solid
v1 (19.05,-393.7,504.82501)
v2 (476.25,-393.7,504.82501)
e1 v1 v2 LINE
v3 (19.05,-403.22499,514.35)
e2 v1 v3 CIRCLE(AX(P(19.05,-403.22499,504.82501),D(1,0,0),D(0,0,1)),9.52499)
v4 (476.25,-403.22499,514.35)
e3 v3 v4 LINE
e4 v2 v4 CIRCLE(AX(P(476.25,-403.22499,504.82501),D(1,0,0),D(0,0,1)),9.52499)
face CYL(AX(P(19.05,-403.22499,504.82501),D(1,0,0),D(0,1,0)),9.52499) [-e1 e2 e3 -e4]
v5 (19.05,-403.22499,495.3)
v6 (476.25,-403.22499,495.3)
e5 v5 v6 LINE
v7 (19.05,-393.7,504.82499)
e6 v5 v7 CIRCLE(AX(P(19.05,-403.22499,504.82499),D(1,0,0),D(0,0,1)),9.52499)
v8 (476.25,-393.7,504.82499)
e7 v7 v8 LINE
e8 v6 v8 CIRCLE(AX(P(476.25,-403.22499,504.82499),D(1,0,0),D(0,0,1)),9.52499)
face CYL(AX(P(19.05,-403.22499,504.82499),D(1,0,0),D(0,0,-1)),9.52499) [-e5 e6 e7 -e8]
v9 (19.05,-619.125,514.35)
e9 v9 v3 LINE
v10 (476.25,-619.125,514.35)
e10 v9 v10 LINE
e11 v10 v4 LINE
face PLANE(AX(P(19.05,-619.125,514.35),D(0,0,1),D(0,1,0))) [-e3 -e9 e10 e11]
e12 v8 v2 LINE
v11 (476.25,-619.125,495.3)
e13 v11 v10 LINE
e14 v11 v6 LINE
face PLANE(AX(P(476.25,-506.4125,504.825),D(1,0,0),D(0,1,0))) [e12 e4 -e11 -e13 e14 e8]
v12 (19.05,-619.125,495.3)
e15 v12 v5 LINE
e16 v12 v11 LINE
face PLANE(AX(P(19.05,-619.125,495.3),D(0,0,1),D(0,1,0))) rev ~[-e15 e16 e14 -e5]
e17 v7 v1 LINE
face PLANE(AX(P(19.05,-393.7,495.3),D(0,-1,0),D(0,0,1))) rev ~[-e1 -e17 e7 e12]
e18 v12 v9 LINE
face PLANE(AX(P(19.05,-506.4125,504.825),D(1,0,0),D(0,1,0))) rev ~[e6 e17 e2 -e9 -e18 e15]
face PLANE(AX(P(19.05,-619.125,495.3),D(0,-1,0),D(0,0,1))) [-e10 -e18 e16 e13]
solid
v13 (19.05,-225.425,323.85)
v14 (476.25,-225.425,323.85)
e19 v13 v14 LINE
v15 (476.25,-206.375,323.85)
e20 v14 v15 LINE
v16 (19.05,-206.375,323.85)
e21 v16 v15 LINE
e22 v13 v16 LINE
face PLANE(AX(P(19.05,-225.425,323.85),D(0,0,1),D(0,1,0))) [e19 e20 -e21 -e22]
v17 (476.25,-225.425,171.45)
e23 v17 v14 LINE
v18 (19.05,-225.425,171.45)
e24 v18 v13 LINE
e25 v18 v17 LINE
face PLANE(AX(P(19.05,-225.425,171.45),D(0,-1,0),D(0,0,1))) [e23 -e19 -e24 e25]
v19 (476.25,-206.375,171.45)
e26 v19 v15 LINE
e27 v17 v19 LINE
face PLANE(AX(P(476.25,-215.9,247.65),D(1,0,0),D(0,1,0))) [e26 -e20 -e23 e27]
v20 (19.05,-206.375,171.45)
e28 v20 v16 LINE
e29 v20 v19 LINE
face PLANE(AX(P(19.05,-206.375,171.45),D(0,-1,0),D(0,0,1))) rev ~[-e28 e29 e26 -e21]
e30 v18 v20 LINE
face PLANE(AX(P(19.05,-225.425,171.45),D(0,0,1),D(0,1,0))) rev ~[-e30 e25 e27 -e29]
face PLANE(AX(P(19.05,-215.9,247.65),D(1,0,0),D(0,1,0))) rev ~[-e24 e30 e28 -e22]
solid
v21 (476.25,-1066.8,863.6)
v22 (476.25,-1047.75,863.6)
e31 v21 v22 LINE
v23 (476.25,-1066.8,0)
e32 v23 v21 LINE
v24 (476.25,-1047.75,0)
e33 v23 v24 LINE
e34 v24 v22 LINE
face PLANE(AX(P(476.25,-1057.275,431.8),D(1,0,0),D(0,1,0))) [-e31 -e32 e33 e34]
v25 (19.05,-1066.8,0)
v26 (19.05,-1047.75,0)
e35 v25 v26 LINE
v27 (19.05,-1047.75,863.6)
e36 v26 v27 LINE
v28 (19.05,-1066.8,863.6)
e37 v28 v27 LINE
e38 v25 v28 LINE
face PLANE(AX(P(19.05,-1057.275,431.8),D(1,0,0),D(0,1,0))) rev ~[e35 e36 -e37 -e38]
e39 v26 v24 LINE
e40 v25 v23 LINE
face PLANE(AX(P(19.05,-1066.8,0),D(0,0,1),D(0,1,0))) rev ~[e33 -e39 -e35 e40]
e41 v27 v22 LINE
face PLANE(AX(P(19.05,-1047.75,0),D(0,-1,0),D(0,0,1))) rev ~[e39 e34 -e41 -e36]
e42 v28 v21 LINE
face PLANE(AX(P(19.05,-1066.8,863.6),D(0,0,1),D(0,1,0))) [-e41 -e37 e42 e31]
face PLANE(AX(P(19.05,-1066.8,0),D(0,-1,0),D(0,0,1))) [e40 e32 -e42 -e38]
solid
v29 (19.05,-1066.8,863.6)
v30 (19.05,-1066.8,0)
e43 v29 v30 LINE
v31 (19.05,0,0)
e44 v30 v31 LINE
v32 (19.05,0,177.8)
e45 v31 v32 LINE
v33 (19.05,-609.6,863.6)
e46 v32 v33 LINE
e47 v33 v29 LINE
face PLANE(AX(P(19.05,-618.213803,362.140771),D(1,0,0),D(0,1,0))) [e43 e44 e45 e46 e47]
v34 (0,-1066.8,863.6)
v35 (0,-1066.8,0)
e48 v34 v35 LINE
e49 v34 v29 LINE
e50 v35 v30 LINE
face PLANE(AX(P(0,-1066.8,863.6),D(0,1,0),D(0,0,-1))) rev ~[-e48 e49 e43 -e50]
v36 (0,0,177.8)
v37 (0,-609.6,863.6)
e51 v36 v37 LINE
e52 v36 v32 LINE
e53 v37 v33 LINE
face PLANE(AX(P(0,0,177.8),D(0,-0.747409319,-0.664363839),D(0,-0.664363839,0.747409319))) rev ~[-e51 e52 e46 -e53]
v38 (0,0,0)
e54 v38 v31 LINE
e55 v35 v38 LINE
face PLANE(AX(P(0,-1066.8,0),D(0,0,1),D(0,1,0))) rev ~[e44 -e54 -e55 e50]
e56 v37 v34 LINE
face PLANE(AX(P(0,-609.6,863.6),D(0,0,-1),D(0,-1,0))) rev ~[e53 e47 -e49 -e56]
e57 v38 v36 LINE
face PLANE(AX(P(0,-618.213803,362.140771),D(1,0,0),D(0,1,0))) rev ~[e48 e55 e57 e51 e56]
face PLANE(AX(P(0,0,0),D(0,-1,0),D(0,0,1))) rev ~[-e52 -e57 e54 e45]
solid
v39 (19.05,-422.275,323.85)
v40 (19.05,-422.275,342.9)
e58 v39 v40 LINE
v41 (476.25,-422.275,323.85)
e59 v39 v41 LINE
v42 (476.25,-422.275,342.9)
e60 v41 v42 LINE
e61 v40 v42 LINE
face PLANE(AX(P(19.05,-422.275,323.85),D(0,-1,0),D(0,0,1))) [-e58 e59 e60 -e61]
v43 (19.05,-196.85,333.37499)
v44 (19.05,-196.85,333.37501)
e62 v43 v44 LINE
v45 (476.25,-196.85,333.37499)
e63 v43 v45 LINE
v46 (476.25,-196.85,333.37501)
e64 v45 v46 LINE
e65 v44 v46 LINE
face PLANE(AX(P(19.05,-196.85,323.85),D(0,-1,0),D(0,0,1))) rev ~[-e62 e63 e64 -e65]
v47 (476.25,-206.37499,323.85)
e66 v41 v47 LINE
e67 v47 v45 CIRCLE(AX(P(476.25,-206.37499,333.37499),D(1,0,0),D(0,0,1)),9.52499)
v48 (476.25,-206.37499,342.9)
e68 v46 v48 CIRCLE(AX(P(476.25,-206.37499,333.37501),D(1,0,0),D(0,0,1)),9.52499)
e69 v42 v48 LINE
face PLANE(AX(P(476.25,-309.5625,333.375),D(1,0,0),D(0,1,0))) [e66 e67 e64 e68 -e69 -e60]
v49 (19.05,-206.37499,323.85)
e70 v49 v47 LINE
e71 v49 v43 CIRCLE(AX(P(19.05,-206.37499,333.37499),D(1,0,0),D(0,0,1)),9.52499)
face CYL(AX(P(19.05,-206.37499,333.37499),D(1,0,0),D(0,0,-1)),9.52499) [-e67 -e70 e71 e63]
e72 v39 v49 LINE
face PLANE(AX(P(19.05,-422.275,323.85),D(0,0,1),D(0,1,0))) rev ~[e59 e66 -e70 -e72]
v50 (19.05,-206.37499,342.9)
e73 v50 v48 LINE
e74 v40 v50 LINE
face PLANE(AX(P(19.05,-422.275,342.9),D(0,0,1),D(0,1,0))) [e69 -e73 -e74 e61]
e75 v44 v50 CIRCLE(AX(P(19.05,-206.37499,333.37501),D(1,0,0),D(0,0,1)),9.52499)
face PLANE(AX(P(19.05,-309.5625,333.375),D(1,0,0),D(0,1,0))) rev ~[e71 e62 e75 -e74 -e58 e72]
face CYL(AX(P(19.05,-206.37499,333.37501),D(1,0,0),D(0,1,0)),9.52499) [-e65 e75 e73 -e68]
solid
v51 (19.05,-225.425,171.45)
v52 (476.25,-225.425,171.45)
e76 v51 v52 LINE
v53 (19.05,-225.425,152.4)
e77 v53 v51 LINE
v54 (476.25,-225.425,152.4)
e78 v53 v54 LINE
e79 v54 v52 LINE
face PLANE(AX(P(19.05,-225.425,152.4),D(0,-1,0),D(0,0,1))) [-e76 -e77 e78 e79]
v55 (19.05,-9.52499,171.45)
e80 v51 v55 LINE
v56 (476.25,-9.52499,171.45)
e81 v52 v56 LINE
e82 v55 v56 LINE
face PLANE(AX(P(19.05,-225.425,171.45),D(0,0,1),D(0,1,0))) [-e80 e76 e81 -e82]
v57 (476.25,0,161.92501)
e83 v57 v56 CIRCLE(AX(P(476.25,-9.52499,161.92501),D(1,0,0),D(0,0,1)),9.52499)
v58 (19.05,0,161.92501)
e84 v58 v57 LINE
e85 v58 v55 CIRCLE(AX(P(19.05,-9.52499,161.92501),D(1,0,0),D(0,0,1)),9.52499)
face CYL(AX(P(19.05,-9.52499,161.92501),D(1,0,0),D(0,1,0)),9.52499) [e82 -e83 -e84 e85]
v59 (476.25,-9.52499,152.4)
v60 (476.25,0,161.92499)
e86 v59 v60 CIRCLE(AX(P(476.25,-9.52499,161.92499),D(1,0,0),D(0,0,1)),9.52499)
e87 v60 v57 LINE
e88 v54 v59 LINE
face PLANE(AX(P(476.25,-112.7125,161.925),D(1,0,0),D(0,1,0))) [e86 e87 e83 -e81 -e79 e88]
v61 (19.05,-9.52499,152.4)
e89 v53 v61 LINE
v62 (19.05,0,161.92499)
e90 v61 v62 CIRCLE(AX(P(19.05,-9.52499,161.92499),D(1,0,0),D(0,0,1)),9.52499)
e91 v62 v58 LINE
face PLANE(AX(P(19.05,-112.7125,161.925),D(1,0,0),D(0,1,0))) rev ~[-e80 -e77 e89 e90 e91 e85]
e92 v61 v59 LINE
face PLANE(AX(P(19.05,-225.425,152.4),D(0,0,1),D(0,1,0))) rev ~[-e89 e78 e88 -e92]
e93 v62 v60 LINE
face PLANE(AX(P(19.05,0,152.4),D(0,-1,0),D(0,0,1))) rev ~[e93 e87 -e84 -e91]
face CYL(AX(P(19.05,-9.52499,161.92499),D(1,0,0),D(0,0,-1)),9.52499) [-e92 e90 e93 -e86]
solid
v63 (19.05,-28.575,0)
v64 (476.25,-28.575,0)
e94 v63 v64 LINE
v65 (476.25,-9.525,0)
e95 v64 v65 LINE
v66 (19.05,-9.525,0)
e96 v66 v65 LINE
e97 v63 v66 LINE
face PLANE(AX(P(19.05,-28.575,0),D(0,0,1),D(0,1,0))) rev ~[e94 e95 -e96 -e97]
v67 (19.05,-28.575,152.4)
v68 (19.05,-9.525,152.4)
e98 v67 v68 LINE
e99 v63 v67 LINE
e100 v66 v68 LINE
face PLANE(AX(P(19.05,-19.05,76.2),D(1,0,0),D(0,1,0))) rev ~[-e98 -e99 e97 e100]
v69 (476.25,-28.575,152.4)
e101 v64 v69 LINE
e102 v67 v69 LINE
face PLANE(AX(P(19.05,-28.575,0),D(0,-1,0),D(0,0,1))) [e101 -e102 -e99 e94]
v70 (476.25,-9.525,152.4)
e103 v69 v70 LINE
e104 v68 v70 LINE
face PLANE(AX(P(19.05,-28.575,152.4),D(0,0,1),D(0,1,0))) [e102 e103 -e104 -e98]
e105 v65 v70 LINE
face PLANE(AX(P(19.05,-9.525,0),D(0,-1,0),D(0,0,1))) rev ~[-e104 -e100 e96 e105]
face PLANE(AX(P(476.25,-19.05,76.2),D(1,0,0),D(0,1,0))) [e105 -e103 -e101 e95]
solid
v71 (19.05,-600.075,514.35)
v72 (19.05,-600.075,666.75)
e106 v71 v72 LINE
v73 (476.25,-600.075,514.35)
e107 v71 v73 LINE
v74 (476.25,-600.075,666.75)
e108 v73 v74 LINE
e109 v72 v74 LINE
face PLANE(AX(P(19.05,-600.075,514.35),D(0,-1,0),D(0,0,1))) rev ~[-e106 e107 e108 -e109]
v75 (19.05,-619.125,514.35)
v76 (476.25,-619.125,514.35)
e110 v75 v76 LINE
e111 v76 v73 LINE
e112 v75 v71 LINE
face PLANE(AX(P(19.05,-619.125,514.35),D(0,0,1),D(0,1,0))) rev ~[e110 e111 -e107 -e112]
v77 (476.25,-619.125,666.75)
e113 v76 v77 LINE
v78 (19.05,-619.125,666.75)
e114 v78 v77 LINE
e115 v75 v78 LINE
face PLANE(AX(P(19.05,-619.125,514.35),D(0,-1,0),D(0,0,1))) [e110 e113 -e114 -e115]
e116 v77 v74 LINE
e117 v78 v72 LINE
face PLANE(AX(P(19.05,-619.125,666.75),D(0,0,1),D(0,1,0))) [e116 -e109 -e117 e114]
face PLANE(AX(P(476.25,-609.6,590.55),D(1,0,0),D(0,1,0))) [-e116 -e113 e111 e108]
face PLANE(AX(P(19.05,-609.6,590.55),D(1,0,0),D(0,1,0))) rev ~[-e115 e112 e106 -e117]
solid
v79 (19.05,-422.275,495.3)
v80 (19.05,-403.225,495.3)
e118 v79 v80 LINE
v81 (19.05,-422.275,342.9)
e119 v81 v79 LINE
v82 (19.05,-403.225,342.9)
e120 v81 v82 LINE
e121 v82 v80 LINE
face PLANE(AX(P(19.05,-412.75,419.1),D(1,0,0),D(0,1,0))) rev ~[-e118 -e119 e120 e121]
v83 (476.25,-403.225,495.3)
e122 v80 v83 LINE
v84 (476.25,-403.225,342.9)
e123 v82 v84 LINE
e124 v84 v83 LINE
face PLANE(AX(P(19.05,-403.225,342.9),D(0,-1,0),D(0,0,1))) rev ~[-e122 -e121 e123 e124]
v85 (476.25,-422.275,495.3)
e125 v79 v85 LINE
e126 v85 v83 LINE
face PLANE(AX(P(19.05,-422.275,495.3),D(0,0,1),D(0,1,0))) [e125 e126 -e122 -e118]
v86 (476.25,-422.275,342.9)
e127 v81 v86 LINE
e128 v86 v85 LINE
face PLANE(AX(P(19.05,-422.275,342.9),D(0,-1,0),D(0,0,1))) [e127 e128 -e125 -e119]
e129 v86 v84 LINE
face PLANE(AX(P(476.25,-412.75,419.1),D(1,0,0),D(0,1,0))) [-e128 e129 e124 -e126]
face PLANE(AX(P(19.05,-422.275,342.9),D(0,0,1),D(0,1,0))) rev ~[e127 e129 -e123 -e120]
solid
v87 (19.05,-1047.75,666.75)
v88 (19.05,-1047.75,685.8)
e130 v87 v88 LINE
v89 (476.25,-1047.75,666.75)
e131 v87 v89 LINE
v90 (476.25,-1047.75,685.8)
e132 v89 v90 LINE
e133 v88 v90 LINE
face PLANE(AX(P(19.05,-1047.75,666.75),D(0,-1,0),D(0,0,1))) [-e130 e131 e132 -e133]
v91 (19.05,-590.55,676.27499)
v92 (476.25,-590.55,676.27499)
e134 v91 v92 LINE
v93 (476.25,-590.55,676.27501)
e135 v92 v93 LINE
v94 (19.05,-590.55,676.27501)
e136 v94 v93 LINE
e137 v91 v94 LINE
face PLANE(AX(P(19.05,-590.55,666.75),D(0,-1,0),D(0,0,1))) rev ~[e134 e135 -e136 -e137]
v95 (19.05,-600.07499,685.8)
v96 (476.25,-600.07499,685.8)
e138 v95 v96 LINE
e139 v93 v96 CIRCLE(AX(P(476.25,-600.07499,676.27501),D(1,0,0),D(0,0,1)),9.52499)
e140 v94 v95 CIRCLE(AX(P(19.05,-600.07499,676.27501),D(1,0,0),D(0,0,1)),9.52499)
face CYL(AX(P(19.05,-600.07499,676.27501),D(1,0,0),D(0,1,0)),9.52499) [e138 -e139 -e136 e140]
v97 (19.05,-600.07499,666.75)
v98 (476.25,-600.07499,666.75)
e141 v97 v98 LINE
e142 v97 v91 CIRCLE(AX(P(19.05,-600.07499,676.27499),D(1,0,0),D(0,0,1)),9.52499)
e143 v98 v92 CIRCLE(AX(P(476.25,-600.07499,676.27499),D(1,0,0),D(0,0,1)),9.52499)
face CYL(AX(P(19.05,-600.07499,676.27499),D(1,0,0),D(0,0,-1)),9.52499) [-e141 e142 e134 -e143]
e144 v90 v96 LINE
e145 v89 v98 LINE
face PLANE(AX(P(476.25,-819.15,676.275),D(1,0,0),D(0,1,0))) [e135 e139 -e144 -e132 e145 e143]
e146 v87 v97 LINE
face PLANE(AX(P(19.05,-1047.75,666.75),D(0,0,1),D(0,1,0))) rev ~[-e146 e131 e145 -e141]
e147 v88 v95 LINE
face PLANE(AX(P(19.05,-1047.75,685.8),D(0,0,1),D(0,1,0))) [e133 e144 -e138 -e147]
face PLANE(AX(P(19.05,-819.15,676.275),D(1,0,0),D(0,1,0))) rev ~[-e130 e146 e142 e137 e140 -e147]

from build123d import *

# Parameters (mm, degrees)
F1_DEPTH = 19.05
F2_W     = 19.05
F2_H     = 863.6
F3_DEPTH = 457.2
F4_W     = 457.2
F4_H     = 19.05
F5_DEPTH = 457.2
F4_W_2   = 225.425
F6_R     = 9.52499
F6_2_R   = 9.52499
F6_3_R   = 9.52499
F6_4_R   = 9.52499
F7_W     = 19.05
F7_H     = 152.4
F8_DEPTH = 457.2


# Not quite as in the source:
# - a fillet or chamfer is up to 0.001 mm smaller than in the source, because OpenCascade refuses the exact size


with BuildPart() as f1:
    # F0 (on Right) → F1 (new body)
    with BuildSketch(Plane.YZ):
        Polygon((-609.6, 863.6), (-1066.8, 863.6), (-1066.8, 0), (0, 0), (0, 177.8), align=None)
    extrude(amount=F1_DEPTH)


with BuildPart() as f3:
    # F2 (on face) → F3 (new body)
    with BuildSketch(Plane.YZ.offset(19.05)):
        with Locations((-1057.275, 431.8)):
            Rectangle(F2_W, F2_H)
    extrude(amount=F3_DEPTH)


with BuildPart() as f5:
    # F4 (on face) → F5 (new body, through all)
    with BuildSketch(Plane.YZ.offset(19.05)):
        with Locations((-819.15, 676.275)):
            Rectangle(F4_W, F4_H)
    extrude(amount=F5_DEPTH)

    # F6 (radius 9.525 in the source; OpenCascade refuses exactly that, so slightly less here)
    f6_edges = [f5.edges().sort_by_distance(p)[0] for p in [
        (247.65, -590.55, 685.8),
        (247.65, -590.55, 666.75),
    ]]
    fillet(f6_edges, radius=F6_R)


with BuildPart() as f5b:
    # F4 (on face) → F5, piece 2 (new body, through all)
    with BuildSketch(Plane.YZ.offset(19.05)):
        with Locations((-112.7125, 161.925)):
            Rectangle(F4_W_2, F4_H)
    extrude(amount=F5_DEPTH)

    # F6#4 (radius 9.525 in the source; OpenCascade refuses exactly that, so slightly less here)
    f6_4_edges = [f5b.edges().sort_by_distance(p)[0] for p in [
        (247.65, 0, 171.45),
        (247.65, 0, 152.4),
    ]]
    fillet(f6_4_edges, radius=F6_4_R)


with BuildPart() as f5c:
    # F4 (on face) → F5, piece 3 (new body, through all)
    with BuildSketch(Plane.YZ.offset(19.05)):
        with Locations((-309.5625, 333.375)):
            Rectangle(F4_W_2, F4_H)
    extrude(amount=F5_DEPTH)

    # F6#3 (radius 9.525 in the source; OpenCascade refuses exactly that, so slightly less here)
    f6_3_edges = [f5c.edges().sort_by_distance(p)[0] for p in [
        (247.65, -196.85, 342.9),
        (247.65, -196.85, 323.85),
    ]]
    fillet(f6_3_edges, radius=F6_3_R)


with BuildPart() as f5d:
    # F4 (on face) → F5, piece 4 (new body, through all)
    with BuildSketch(Plane.YZ.offset(19.05)):
        with Locations((-506.4125, 504.825)):
            Rectangle(F4_W_2, F4_H)
    extrude(amount=F5_DEPTH)

    # F6#2 (radius 9.525 in the source; OpenCascade refuses exactly that, so slightly less here)
    f6_2_edges = [f5d.edges().sort_by_distance(p)[0] for p in [
        (247.65, -393.7, 514.35),
        (247.65, -393.7, 495.3),
    ]]
    fillet(f6_2_edges, radius=F6_2_R)


with BuildPart() as f8:
    # F7 (on face) → F8 (new body, through all)
    with BuildSketch(Plane.YZ.offset(19.05)):
        with Locations((-609.6, 590.55)):
            Rectangle(F7_W, F7_H)
    extrude(amount=F8_DEPTH)


with BuildPart() as f8b:
    # F7 (on face) → F8, piece 2 (new body, through all)
    with BuildSketch(Plane.YZ.offset(19.05)):
        with Locations((-412.75, 419.1)):
            Rectangle(F7_W, F7_H)
    extrude(amount=F8_DEPTH)


with BuildPart() as f8c:
    # F7 (on face) → F8, piece 3 (new body, through all)
    with BuildSketch(Plane.YZ.offset(19.05)):
        with Locations((-215.9, 247.65)):
            Rectangle(F7_W, F7_H)
    extrude(amount=F8_DEPTH)


with BuildPart() as f8d:
    # F7 (on face) → F8, piece 4 (new body, through all)
    with BuildSketch(Plane.YZ.offset(19.05)):
        with Locations((-19.05, 76.2)):
            Rectangle(F7_W, F7_H)
    extrude(amount=F8_DEPTH)


solid = Compound([f1.part, f3.part, f5.part, f5b.part, f5c.part, f5d.part, f8.part, f8b.part, f8c.part, f8d.part])
